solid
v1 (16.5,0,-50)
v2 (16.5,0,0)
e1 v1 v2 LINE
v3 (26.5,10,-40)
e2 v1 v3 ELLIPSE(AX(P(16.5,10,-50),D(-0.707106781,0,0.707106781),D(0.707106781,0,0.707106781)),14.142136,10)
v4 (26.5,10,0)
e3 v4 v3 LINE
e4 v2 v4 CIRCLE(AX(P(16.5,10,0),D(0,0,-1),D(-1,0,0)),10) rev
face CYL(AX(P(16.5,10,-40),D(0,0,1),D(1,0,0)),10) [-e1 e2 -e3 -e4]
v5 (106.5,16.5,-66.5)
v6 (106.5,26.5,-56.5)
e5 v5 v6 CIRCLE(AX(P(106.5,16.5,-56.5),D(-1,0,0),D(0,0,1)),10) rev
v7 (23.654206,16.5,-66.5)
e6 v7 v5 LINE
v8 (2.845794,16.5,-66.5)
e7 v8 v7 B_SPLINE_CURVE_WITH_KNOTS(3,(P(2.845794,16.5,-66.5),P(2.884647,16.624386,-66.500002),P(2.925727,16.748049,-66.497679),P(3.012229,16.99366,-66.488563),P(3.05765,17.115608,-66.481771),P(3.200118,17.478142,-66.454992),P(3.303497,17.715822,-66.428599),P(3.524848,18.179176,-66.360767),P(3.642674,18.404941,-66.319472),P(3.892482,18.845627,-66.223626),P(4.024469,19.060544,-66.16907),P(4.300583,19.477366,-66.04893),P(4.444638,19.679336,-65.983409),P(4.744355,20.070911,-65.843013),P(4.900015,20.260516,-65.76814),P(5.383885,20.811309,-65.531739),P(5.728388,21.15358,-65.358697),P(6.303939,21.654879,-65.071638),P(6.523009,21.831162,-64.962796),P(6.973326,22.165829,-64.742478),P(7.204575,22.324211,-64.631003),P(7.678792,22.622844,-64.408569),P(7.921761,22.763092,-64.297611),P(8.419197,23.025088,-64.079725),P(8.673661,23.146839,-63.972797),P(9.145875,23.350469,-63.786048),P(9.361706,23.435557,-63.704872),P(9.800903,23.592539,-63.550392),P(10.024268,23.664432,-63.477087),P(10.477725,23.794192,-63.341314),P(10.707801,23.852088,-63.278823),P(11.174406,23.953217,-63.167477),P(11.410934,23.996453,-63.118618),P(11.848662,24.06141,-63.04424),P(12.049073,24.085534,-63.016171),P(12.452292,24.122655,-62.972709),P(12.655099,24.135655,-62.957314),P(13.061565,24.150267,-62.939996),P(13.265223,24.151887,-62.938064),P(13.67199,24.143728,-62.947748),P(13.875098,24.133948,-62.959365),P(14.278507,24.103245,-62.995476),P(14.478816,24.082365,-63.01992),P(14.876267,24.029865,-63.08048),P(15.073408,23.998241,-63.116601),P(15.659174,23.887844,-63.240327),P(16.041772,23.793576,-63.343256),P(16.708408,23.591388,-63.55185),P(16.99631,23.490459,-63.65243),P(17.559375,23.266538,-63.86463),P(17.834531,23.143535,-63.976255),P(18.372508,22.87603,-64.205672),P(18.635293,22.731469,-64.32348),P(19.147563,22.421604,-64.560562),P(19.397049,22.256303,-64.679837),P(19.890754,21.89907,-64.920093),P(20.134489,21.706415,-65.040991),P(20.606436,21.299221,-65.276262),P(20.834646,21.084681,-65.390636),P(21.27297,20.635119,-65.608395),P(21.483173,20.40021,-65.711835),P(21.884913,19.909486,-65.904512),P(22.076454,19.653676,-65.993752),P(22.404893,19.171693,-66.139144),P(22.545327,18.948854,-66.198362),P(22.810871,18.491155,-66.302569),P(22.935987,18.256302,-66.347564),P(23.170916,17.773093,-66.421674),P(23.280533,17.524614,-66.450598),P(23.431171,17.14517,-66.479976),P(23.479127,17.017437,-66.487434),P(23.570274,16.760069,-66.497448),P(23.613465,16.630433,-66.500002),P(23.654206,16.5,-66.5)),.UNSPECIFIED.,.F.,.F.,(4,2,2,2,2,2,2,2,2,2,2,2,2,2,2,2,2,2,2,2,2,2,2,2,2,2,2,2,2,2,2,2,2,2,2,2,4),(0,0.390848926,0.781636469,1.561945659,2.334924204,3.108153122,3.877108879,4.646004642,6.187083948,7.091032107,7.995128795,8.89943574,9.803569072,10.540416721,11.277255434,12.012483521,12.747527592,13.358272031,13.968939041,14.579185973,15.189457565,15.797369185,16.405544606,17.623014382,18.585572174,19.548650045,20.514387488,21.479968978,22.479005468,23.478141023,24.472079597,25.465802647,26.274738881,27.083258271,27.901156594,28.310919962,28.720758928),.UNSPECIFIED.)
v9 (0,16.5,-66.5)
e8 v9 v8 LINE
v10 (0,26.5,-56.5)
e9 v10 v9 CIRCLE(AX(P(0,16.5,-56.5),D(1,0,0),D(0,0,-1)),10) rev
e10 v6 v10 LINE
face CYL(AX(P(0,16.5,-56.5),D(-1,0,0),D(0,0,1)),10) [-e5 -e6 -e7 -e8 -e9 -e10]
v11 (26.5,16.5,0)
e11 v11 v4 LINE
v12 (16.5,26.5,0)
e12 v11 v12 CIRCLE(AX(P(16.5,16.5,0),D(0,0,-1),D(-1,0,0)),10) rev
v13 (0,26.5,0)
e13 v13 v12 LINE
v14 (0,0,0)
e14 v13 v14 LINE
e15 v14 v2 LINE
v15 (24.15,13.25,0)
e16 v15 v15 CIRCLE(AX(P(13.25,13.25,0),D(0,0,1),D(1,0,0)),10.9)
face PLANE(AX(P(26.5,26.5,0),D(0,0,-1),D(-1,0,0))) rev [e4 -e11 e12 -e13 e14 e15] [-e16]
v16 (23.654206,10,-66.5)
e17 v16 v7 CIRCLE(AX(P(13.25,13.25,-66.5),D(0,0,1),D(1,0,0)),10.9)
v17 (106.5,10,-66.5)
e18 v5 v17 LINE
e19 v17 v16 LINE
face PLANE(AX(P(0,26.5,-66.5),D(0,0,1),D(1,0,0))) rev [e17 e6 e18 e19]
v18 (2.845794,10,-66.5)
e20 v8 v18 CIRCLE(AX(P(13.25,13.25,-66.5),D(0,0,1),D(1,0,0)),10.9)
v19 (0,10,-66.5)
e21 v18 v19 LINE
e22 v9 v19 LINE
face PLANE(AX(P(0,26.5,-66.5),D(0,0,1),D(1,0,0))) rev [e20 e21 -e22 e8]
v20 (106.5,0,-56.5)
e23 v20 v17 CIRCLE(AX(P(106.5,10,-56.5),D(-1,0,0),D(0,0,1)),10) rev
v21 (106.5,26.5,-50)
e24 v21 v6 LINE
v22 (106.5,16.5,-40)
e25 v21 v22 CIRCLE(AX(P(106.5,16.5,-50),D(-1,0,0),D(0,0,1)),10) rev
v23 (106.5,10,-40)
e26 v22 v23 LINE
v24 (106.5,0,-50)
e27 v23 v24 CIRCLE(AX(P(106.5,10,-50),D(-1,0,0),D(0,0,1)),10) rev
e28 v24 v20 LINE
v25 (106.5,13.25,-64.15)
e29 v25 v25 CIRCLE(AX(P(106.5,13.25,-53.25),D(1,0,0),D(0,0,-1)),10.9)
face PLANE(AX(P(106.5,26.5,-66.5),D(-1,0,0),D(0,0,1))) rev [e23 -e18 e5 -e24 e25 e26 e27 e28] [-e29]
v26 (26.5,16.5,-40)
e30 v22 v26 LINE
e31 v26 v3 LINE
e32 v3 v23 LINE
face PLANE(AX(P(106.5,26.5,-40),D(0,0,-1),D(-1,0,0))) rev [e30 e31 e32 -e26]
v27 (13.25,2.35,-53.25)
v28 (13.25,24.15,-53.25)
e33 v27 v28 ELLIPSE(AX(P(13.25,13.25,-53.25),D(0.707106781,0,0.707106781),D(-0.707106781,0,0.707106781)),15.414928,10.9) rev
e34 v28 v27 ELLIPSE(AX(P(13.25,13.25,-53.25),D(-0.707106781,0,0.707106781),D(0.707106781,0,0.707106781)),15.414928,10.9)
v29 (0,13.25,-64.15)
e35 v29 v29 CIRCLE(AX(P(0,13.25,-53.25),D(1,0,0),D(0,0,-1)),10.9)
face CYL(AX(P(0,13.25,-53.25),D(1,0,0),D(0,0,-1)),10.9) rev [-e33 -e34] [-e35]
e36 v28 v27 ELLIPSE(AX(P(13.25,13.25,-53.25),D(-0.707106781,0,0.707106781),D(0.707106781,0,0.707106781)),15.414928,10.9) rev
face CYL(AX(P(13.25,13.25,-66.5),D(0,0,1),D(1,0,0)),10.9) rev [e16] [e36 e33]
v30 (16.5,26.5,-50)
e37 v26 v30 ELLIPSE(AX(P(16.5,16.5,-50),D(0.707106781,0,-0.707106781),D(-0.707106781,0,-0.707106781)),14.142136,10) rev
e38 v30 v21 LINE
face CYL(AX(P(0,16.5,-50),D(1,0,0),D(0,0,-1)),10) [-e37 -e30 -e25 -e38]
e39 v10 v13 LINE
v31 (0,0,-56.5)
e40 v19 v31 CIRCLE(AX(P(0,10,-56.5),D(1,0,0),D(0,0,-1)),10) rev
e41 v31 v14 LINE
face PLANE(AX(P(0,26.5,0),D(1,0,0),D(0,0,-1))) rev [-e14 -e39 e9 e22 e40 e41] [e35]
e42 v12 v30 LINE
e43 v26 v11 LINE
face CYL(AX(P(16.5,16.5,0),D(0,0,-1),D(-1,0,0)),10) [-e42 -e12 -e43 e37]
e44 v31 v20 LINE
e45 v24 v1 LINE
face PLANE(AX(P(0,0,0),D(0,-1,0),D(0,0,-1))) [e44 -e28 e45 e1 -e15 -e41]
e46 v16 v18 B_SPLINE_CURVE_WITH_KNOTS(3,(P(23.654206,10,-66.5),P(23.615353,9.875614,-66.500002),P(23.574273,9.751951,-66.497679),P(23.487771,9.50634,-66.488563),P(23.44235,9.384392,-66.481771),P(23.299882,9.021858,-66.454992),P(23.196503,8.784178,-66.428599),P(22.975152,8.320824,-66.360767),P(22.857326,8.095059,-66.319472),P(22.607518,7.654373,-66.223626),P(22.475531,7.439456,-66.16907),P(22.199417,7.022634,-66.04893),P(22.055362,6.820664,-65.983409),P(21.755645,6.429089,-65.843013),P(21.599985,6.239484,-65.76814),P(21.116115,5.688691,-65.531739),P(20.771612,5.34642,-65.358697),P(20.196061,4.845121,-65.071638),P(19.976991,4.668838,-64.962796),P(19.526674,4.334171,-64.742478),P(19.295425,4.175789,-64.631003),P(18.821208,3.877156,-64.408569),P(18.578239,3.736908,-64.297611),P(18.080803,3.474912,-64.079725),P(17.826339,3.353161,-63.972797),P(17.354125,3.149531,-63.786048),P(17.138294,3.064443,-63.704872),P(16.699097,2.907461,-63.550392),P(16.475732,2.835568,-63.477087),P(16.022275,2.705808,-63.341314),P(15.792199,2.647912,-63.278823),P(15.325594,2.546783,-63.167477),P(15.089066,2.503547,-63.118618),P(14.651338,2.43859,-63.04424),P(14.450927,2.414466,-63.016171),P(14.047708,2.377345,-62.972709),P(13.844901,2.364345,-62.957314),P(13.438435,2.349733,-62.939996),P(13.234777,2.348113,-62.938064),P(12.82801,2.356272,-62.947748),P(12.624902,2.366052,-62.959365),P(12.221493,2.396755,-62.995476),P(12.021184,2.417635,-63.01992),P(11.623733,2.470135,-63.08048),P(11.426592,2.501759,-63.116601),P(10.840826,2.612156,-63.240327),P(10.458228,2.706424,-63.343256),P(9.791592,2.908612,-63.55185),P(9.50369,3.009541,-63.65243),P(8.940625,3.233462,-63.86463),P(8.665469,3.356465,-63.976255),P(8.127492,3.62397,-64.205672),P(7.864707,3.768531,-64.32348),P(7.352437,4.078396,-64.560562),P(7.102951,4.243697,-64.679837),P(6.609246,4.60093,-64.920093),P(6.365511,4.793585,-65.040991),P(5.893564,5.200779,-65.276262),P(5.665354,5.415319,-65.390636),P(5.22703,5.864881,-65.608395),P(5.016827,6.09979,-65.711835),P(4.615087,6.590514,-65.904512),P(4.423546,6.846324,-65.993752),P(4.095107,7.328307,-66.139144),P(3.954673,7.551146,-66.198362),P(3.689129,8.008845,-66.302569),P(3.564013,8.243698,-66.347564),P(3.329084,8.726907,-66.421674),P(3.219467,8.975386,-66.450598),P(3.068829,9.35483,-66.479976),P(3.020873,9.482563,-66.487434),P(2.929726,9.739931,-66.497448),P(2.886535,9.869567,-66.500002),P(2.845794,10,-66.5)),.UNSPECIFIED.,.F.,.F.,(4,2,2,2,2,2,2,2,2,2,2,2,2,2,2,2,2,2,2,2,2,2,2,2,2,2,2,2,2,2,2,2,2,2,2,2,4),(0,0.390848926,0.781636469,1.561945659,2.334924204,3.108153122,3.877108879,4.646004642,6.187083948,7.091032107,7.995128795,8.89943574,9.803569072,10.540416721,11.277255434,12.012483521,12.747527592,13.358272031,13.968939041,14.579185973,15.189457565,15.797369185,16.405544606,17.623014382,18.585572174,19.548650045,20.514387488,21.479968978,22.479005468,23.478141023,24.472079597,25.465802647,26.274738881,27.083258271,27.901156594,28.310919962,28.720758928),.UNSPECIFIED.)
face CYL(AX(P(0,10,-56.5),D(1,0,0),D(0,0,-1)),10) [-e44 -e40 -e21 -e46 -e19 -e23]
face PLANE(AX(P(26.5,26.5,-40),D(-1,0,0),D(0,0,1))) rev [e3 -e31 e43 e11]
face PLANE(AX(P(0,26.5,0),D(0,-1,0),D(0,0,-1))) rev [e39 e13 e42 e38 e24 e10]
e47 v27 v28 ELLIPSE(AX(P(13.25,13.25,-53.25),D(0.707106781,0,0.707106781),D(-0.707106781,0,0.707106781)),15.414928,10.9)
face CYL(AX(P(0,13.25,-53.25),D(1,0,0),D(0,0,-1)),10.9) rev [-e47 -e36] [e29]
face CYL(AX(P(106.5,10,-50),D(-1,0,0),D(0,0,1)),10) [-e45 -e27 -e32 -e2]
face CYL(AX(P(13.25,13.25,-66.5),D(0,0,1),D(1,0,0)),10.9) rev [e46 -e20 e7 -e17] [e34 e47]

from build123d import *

# Parameters (mm, degrees)
BOSS_EXTRUDE1_DEPTH = 26.5
SKETCH3_R           = 10.9
CUT_EXTRUDE1_DEPTH  = 129.322835068
SKETCH4_R           = 10.9
CUT_EXTRUDE2_DEPTH  = 129.322835068
FILLET1_R           = 10


with BuildPart() as part:
    # Sketch2 → Boss-Extrude1 (new body)
    with BuildSketch(Plane(origin=(0, 0, 0), x_dir=(1, 0, 0), z_dir=(0, 1, 0))):
        Polygon((0, 0), (0, 66.5), (106.5, 66.5), (106.5, 40), (26.5, 40), (26.5, 0), align=None)
    extrude(amount=BOSS_EXTRUDE1_DEPTH)

    # Sketch3 → Cut-Extrude1 (cut, through all)
    with BuildSketch(Plane.XY):
        with Locations((13.25, 13.25)):
            Circle(SKETCH3_R)
    extrude(amount=-CUT_EXTRUDE1_DEPTH, mode=Mode.SUBTRACT)

    # Sketch4 → Cut-Extrude2 (cut, through all)
    with BuildSketch(Plane(origin=(106.5, 0, 0), x_dir=(0, 0, -1), z_dir=(1, 0, 0))):
        with Locations((53.25, 13.25)):
            Circle(SKETCH4_R)
    extrude(amount=-CUT_EXTRUDE2_DEPTH, mode=Mode.SUBTRACT)

    # Fillet1
    # the kernel refuses this fillet: 10 mm, written as the material it takes off along each edge
    with BuildSketch(Plane(origin=(106.5, 26.5, -40), x_dir=(0, 0, -1), z_dir=(-1, 0, 0))) as fillet1_piece_1:
        with BuildLine():
            CenterArc((FILLET1_R, FILLET1_R), FILLET1_R, 180, 90)
            Line((0, FILLET1_R), (-FILLET1_R * 0.02, FILLET1_R))
            Line((-FILLET1_R * 0.02, FILLET1_R), (-FILLET1_R * 0.02, -FILLET1_R * 0.02))
            Line((-FILLET1_R * 0.02, -FILLET1_R * 0.02), (FILLET1_R, -FILLET1_R * 0.02))
            Line((FILLET1_R, -FILLET1_R * 0.02), (FILLET1_R, 0))
        make_face()
    extrude(amount=80, mode=Mode.SUBTRACT)
    with BuildSketch(Plane(origin=(0, 26.5, -66.5), x_dir=(0, 0, 1), z_dir=(1, 0, 0))) as fillet1_piece_2:
        with BuildLine():
            CenterArc((FILLET1_R, FILLET1_R), FILLET1_R, 180, 90)
            Line((0, FILLET1_R), (-FILLET1_R * 0.02, FILLET1_R))
            Line((-FILLET1_R * 0.02, FILLET1_R), (-FILLET1_R * 0.02, -FILLET1_R * 0.02))
            Line((-FILLET1_R * 0.02, -FILLET1_R * 0.02), (FILLET1_R, -FILLET1_R * 0.02))
            Line((FILLET1_R, -FILLET1_R * 0.02), (FILLET1_R, 0))
        make_face()
    extrude(amount=106.5, mode=Mode.SUBTRACT)
    with BuildSketch(Plane(origin=(0, 0, -66.5), x_dir=(0, 0, 1), z_dir=(1, 0, 0))) as fillet1_piece_3:
        with BuildLine():
            CenterArc((FILLET1_R, -FILLET1_R), FILLET1_R, 90, 90)
            Line((0, -FILLET1_R), (-FILLET1_R * 0.02, -FILLET1_R))
            Line((-FILLET1_R * 0.02, -FILLET1_R), (-FILLET1_R * 0.02, FILLET1_R * 0.02))
            Line((-FILLET1_R * 0.02, FILLET1_R * 0.02), (FILLET1_R, FILLET1_R * 0.02))
            Line((FILLET1_R, FILLET1_R * 0.02), (FILLET1_R, 0))
        make_face()
    extrude(amount=106.5, mode=Mode.SUBTRACT)
    with BuildSketch(Plane(origin=(106.5, 0, -40), x_dir=(0, 0, -1), z_dir=(-1, 0, 0))) as fillet1_piece_4:
        with BuildLine():
            CenterArc((FILLET1_R, -FILLET1_R), FILLET1_R, 90, 90)
            Line((0, -FILLET1_R), (-FILLET1_R * 0.02, -FILLET1_R))
            Line((-FILLET1_R * 0.02, -FILLET1_R), (-FILLET1_R * 0.02, FILLET1_R * 0.02))
            Line((-FILLET1_R * 0.02, FILLET1_R * 0.02), (FILLET1_R, FILLET1_R * 0.02))
            Line((FILLET1_R, FILLET1_R * 0.02), (FILLET1_R, 0))
        make_face()
    extrude(amount=80, mode=Mode.SUBTRACT)
    with BuildSketch(Plane(origin=(26.5, 0, -40), x_dir=(-1, 0, 0), z_dir=(0, 0, 1))) as fillet1_piece_5:
        with BuildLine():
            CenterArc((FILLET1_R, -FILLET1_R), FILLET1_R, 90, 90)
            Line((0, -FILLET1_R), (-FILLET1_R * 0.02, -FILLET1_R))
            Line((-FILLET1_R * 0.02, -FILLET1_R), (-FILLET1_R * 0.02, FILLET1_R * 0.02))
            Line((-FILLET1_R * 0.02, FILLET1_R * 0.02), (FILLET1_R, FILLET1_R * 0.02))
            Line((FILLET1_R, FILLET1_R * 0.02), (FILLET1_R, 0))
        make_face()
    extrude(amount=40, mode=Mode.SUBTRACT)
    with BuildSketch(Plane(origin=(26.5, 26.5, -40), x_dir=(-1, 0, 0), z_dir=(0, 0, 1))) as fillet1_piece_6:
        with BuildLine():
            CenterArc((FILLET1_R, FILLET1_R), FILLET1_R, 180, 90)
            Line((0, FILLET1_R), (-FILLET1_R * 0.02, FILLET1_R))
            Line((-FILLET1_R * 0.02, FILLET1_R), (-FILLET1_R * 0.02, -FILLET1_R * 0.02))
            Line((-FILLET1_R * 0.02, -FILLET1_R * 0.02), (FILLET1_R, -FILLET1_R * 0.02))
            Line((FILLET1_R, -FILLET1_R * 0.02), (FILLET1_R, 0))
        make_face()
    extrude(amount=40, mode=Mode.SUBTRACT)
    with BuildSketch(Plane(origin=(106.5, 26.5, -40), x_dir=(0, 0, -1), z_dir=(-1, 0, 0))) as fillet1_piece_7a_section:
        with BuildLine():
            CenterArc((FILLET1_R, FILLET1_R), FILLET1_R, 180, 90)
            Line((0, FILLET1_R), (-FILLET1_R * 0.02, FILLET1_R))
            Line((-FILLET1_R * 0.02, FILLET1_R), (-FILLET1_R * 0.02, -FILLET1_R * 0.02))
            Line((-FILLET1_R * 0.02, -FILLET1_R * 0.02), (FILLET1_R, -FILLET1_R * 0.02))
            Line((FILLET1_R, -FILLET1_R * 0.02), (FILLET1_R, 0))
        make_face()
    fillet1_piece_7a = extrude(amount=105, mode=Mode.PRIVATE)
    fillet1_piece_7a = split(fillet1_piece_7a, bisect_by=Plane(origin=(26.5, 24.236048857, -42.263951143), z_dir=(-1, 0, 0)), keep=Keep.TOP, mode=Mode.PRIVATE)
    with BuildSketch(Plane(origin=(26.5, 26.5, -65), x_dir=(-1, 0, 0), z_dir=(0, 0, 1))) as fillet1_piece_7b_section:
        with BuildLine():
            CenterArc((FILLET1_R, FILLET1_R), FILLET1_R, 180, 90)
            Line((0, FILLET1_R), (-FILLET1_R * 0.02, FILLET1_R))
            Line((-FILLET1_R * 0.02, FILLET1_R), (-FILLET1_R * 0.02, -FILLET1_R * 0.02))
            Line((-FILLET1_R * 0.02, -FILLET1_R * 0.02), (FILLET1_R, -FILLET1_R * 0.02))
            Line((FILLET1_R, -FILLET1_R * 0.02), (FILLET1_R, 0))
        make_face()
    fillet1_piece_7b = extrude(amount=65, mode=Mode.PRIVATE)
    fillet1_piece_7b = split(fillet1_piece_7b, bisect_by=Plane(origin=(24.236048857, 24.236048857, -40), z_dir=(0, 0, -1)), keep=Keep.TOP, mode=Mode.PRIVATE)
    fillet1_piece_7 = fillet1_piece_7a & fillet1_piece_7b
    add(fillet1_piece_7, mode=Mode.SUBTRACT)
    with BuildSketch(Plane(origin=(106.5, 0, -40), x_dir=(0, 0, -1), z_dir=(-1, 0, 0))) as fillet1_piece_8a_section:
        with BuildLine():
            CenterArc((FILLET1_R, -FILLET1_R), FILLET1_R, 90, 90)
            Line((0, -FILLET1_R), (-FILLET1_R * 0.02, -FILLET1_R))
            Line((-FILLET1_R * 0.02, -FILLET1_R), (-FILLET1_R * 0.02, FILLET1_R * 0.02))
            Line((-FILLET1_R * 0.02, FILLET1_R * 0.02), (FILLET1_R, FILLET1_R * 0.02))
            Line((FILLET1_R, FILLET1_R * 0.02), (FILLET1_R, 0))
        make_face()
    fillet1_piece_8a = extrude(amount=105, mode=Mode.PRIVATE)
    fillet1_piece_8a = split(fillet1_piece_8a, bisect_by=Plane(origin=(26.5, 2.263951143, -42.263951143), z_dir=(-1, 0, 0)), keep=Keep.TOP, mode=Mode.PRIVATE)
    with BuildSketch(Plane(origin=(26.5, 0, -65), x_dir=(-1, 0, 0), z_dir=(0, 0, 1))) as fillet1_piece_8b_section:
        with BuildLine():
            CenterArc((FILLET1_R, -FILLET1_R), FILLET1_R, 90, 90)
            Line((0, -FILLET1_R), (-FILLET1_R * 0.02, -FILLET1_R))
            Line((-FILLET1_R * 0.02, -FILLET1_R), (-FILLET1_R * 0.02, FILLET1_R * 0.02))
            Line((-FILLET1_R * 0.02, FILLET1_R * 0.02), (FILLET1_R, FILLET1_R * 0.02))
            Line((FILLET1_R, FILLET1_R * 0.02), (FILLET1_R, 0))
        make_face()
    fillet1_piece_8b = extrude(amount=65, mode=Mode.PRIVATE)
    fillet1_piece_8b = split(fillet1_piece_8b, bisect_by=Plane(origin=(24.236048857, 2.263951143, -40), z_dir=(0, 0, -1)), keep=Keep.TOP, mode=Mode.PRIVATE)
    fillet1_piece_8 = fillet1_piece_8a & fillet1_piece_8b
    add(fillet1_piece_8, mode=Mode.SUBTRACT)


solid = part.part
